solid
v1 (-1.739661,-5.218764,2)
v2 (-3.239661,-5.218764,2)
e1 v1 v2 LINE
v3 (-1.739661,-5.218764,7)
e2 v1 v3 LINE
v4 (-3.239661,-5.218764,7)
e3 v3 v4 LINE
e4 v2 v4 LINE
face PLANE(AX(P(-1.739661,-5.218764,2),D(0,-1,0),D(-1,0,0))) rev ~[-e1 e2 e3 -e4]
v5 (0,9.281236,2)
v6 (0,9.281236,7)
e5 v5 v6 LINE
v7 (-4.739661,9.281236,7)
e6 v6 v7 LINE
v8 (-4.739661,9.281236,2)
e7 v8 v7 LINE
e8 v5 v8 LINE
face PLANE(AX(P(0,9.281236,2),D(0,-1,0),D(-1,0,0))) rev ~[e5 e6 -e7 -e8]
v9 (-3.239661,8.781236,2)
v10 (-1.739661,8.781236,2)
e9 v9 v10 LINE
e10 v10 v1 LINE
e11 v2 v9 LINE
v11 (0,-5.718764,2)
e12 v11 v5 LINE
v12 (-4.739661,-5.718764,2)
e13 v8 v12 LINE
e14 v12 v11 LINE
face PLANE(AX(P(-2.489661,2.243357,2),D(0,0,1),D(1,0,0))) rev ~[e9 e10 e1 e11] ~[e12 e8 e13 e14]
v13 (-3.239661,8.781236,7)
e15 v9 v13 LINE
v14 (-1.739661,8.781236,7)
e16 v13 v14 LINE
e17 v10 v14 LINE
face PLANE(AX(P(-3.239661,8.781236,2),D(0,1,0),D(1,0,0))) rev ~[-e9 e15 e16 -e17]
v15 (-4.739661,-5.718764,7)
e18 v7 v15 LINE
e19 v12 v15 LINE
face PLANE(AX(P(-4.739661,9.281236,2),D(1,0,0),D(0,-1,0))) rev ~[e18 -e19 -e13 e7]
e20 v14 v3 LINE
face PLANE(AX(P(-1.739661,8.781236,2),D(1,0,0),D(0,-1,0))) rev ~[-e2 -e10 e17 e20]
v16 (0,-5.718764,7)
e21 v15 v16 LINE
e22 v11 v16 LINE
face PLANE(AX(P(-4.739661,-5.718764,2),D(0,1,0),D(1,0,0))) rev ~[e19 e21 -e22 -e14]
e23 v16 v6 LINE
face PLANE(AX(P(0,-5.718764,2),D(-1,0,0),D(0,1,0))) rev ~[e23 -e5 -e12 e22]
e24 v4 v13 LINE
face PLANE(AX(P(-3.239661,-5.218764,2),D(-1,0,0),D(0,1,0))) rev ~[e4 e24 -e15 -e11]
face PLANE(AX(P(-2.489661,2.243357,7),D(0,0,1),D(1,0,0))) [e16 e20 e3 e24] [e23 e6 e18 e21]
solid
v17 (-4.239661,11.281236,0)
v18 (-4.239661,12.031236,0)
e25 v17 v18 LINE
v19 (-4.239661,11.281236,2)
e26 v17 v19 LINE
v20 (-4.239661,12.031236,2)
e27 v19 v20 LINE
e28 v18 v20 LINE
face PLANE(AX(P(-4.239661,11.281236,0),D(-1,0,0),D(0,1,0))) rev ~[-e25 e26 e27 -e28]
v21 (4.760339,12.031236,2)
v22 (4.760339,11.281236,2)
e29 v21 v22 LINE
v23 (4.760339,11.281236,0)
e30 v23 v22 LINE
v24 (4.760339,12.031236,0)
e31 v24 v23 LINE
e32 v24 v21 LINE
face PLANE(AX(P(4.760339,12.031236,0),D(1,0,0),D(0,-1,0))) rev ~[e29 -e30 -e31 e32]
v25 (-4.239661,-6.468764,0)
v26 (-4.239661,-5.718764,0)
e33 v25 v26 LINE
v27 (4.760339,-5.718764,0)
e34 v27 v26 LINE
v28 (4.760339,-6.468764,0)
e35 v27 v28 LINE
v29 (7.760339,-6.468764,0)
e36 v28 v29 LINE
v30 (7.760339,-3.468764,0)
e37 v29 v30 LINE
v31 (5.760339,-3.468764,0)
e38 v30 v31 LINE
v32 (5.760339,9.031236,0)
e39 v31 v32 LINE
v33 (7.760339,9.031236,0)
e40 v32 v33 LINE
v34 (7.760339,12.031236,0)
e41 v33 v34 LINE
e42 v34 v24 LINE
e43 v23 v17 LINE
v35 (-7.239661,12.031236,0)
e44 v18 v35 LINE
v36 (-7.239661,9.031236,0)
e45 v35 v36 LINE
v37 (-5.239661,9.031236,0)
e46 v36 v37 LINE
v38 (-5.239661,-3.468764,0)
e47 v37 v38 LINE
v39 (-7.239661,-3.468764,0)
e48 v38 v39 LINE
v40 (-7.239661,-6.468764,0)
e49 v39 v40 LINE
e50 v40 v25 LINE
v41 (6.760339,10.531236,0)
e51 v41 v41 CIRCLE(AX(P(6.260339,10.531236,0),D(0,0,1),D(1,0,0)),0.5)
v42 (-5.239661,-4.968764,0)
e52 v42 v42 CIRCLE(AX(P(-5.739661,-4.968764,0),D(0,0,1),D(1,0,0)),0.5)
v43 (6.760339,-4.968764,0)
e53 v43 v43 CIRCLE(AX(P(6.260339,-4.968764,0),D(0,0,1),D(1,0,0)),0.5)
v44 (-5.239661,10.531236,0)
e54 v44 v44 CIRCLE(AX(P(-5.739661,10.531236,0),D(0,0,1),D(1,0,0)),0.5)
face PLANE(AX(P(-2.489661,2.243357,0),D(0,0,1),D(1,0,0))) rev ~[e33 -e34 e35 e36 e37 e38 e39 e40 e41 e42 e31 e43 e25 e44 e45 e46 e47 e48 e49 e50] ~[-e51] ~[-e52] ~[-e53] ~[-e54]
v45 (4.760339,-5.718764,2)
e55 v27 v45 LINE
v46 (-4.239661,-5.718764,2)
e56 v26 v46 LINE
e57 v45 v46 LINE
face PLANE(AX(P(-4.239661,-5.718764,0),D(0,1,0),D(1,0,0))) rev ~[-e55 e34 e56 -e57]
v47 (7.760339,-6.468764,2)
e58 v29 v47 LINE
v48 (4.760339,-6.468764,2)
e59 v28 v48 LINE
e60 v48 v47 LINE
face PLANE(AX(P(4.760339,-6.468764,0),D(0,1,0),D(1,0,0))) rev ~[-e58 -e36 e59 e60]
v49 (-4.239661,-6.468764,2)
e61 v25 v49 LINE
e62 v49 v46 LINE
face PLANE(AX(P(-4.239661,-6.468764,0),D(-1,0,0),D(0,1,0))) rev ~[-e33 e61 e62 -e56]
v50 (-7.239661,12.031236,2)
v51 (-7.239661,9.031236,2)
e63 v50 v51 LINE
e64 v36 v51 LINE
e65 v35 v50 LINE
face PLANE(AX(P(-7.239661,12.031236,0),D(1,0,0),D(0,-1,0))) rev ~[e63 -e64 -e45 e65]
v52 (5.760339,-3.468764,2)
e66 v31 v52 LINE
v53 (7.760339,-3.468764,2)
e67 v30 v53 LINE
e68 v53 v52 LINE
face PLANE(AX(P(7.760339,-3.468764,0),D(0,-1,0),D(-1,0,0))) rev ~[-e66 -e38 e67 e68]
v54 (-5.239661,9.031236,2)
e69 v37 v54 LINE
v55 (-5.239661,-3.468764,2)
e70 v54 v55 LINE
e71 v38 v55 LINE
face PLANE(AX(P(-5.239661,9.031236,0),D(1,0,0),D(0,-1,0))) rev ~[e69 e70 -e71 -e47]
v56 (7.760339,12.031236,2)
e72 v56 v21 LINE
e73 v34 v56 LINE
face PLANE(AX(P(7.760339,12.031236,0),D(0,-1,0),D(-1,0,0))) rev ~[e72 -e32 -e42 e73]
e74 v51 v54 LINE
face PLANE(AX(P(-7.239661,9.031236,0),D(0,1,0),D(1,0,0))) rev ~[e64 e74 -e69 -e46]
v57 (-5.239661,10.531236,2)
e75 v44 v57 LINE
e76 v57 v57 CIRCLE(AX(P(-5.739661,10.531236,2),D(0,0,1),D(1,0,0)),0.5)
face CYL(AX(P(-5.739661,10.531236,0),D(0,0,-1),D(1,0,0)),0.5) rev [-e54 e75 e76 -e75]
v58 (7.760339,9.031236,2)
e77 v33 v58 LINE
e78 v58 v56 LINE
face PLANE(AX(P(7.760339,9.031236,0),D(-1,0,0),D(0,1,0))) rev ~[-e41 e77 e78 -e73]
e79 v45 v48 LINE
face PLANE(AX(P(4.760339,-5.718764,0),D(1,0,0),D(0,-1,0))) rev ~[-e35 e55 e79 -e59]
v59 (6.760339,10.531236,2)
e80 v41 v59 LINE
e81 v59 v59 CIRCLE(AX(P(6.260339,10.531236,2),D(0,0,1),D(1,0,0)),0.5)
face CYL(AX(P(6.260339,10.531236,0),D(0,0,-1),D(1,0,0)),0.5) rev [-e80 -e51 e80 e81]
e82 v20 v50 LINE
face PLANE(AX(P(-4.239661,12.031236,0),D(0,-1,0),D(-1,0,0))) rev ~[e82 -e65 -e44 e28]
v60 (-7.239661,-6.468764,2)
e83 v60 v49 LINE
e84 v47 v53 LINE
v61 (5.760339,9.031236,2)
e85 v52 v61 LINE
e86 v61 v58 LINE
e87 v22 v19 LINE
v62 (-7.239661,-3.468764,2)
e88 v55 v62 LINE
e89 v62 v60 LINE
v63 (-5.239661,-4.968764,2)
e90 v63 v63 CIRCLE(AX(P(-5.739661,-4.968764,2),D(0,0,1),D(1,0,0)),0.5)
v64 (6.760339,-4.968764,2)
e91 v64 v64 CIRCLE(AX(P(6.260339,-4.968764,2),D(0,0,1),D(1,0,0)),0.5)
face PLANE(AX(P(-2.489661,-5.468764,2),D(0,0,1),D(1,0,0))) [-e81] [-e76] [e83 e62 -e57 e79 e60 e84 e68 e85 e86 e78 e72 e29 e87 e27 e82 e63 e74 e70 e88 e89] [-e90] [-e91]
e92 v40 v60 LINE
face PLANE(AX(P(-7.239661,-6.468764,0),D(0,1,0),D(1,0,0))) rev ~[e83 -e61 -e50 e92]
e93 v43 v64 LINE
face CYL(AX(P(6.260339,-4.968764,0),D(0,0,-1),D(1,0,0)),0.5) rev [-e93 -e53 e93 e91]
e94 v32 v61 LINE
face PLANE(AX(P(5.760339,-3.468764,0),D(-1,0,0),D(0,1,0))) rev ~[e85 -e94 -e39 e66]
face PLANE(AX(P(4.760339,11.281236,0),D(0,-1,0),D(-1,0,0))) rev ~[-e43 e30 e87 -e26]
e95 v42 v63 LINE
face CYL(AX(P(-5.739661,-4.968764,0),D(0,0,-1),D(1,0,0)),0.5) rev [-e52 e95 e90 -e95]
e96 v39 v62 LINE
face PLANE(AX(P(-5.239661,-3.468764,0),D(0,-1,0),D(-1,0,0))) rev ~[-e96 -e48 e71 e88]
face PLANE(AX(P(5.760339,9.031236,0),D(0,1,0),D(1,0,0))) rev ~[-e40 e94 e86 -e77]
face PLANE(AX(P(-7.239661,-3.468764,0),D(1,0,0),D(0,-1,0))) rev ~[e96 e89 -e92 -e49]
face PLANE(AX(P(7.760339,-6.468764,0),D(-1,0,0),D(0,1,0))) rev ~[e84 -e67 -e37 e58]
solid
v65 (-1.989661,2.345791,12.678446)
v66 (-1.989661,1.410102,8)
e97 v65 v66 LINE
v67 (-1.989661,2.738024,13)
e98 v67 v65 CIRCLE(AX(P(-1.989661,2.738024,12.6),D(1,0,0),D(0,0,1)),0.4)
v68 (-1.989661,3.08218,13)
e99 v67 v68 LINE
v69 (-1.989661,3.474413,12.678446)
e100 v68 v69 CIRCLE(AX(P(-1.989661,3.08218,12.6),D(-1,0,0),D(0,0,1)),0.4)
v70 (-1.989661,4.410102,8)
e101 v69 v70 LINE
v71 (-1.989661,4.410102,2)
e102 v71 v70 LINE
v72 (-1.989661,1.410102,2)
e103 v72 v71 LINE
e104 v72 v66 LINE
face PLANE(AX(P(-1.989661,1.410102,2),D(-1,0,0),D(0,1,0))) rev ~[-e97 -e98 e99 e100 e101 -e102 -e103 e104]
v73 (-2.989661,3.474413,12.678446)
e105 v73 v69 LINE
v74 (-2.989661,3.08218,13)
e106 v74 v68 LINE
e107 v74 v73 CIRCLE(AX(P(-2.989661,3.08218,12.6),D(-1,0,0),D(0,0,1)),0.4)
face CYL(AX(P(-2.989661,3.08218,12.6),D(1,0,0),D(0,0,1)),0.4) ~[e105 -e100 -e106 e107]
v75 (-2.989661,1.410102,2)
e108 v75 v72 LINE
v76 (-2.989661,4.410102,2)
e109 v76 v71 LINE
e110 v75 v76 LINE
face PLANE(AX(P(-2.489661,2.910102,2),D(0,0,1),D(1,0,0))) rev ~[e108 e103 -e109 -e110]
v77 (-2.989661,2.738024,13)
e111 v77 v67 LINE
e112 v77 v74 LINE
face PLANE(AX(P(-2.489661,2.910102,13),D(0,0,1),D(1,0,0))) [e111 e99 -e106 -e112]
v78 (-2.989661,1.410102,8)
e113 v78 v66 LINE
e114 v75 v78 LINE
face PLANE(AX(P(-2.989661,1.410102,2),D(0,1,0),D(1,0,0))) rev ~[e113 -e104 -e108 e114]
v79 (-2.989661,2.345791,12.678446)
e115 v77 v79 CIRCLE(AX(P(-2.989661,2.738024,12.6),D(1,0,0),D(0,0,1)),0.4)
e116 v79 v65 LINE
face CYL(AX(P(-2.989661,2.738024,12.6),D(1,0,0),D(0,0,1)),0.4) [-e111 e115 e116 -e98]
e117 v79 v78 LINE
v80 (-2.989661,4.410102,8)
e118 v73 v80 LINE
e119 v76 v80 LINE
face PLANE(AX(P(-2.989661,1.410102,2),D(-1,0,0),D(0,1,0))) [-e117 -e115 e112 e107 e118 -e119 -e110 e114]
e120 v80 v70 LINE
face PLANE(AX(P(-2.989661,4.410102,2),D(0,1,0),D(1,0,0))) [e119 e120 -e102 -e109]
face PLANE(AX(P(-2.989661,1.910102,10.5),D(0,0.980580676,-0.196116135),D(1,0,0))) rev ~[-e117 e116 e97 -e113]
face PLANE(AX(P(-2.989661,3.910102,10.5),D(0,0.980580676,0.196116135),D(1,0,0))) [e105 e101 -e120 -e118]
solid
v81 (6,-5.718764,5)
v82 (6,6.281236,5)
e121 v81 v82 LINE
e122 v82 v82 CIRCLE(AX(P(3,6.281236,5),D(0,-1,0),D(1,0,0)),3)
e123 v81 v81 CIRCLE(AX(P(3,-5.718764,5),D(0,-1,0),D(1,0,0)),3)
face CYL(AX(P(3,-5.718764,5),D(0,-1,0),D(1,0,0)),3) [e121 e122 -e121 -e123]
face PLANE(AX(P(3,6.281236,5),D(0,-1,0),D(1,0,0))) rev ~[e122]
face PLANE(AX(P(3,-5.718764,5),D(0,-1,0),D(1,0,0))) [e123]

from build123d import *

# Parameters (mm, degrees)
F0_R     = 0.5
F0_W     = 1.5
F0_H     = 14
F1_DEPTH = 2
F3_DEPTH = 5
F4_DEPTH = 2
F5_R     = 3
F6_DEPTH = 12
F2_W     = 1
F2_H     = 3
F7_DEPTH = 11
F8_SIZE2 = 5
F8_SIZE  = 1
F9_SIZE2 = 5
F9_SIZE  = 1
F10_R    = 0.4


with BuildPart() as f1:
    # F0 (on Top) → F1 (new body)
    with BuildSketch(Plane.XY):
        Polygon((-4.7396611795, -5.7187644923), (-4.2396611795, -5.7187644923), (-0.2396611795, -5.7187644923), (-0.2396611795, -5.2187644923), (-1.7396611795, -5.2187644923), (-3.2396611795, -5.2187644923), (-4.7396611795, -5.2187644923), align=None)
        Polygon((-4.2396611795, 12.0312355077), (-7.2396611795, 12.0312355077), (-7.2396611795, 9.0312355077), (-5.2396611795, 9.0312355077), (-5.2396611795, -3.4687644923), (-7.2396611795, -3.4687644923), (-7.2396611795, -6.4687644923), (-4.2396611795, -6.4687644923), (-4.2396611795, -5.7187644923), (-4.7396611795, -5.7187644923), (-4.7396611795, -5.2187644923), (-4.7396611795, 9.2812355077), (-0.2396611795, 9.2812355077), (-0.2396611795, -5.2187644923), (-0.2396611795, -5.7187644923), (4.7603388205, -5.7187644923), (4.7603388205, -6.4687644923), (7.7603388205, -6.4687644923), (7.7603388205, -3.4687644923), (5.7603388205, -3.4687644923), (5.7603388205, 9.0312355077), (7.7603388205, 9.0312355077), (7.7603388205, 12.0312355077), (4.7603388205, 12.0312355077), (4.7603388205, 11.2812355077), (-4.2396611795, 11.2812355077), align=None)
        with Locations((-5.7396611795, -4.9687644923)):
            Circle(F0_R, mode=Mode.SUBTRACT)
        with Locations((6.2603388205, -4.9687644923)):
            Circle(F0_R, mode=Mode.SUBTRACT)
        with Locations((-5.7396611795, 10.5312355077)):
            Circle(F0_R, mode=Mode.SUBTRACT)
        with Locations((6.2603388205, 10.5312355077)):
            Circle(F0_R, mode=Mode.SUBTRACT)
        with Locations((-2.4896611795, 1.7812355077)):
            Rectangle(F0_W, F0_H)
    extrude(amount=F1_DEPTH)



with BuildPart() as f3:
    # F2 (on face) → F3 (new body)
    with BuildSketch(Plane.XY.offset(2)):
        Polygon((-0.2396611795, 9.2812355077), (-4.7396611795, 9.2812355077), (-4.7396611795, -5.2187644923), (-3.2396611795, -5.2187644923), (-3.2396611795, 8.7812355077), (-1.7396611795, 8.7812355077), (-1.7396611795, -5.2187644923), (-0.2396611795, -5.2187644923), align=None)
        Polygon((0, 9.2812355077), (-0.2396611795, 9.2812355077), (-0.2396611795, -5.2187644923), (-1.7396611795, -5.2187644923), (-3.2396611795, -5.2187644923), (-4.7396611795, -5.2187644923), (-4.7396611795, -5.7187644923), (-4.2396611795, -5.7187644923), (0, -5.7187644923), align=None)
    extrude(amount=F3_DEPTH)


with BuildPart() as f1_1:
    add(f1.part)
    # F4 (add): a face of the model
    f4_faces = [f3.part.faces().sort_by_distance(p)[0] for p in [
        (-4.5823511709, 1.7812355077, 2),
    ]]
    extrude(f4_faces, amount=F4_DEPTH)


with BuildPart() as f6:
    # F5 (on face) → F6 (new body)
    with BuildSketch(Plane.XZ.offset(5.7187644923)):
        with Locations((3, 5)):
            Circle(F5_R)
    extrude(amount=-F6_DEPTH)


with BuildPart() as f7:
    # F2 (on face) → F7 (new body)
    with BuildSketch(Plane.XY.offset(2)):
        with Locations((-2.4896611795, 2.910102006)):
            Rectangle(F2_W, F2_H)
    extrude(amount=F7_DEPTH)

    # F8
    f8_edges = [f7.edges().sort_by_distance(p)[0] for p in [
        (-2.489661, 1.410102, 13),
    ]]
    f8_side = f7.faces().sort_by_distance((-2.489661, 2.910102, 13))[0]
    chamfer(f8_edges, length=F8_SIZE, length2=F8_SIZE2, reference=f8_side)

    # F9
    f9_edges = [f7.edges().sort_by_distance(p)[0] for p in [
        (-2.489661, 4.410102, 13),
    ]]
    f9_side = f7.faces().sort_by_distance((-2.489661, 3.410102, 13))[0]
    chamfer(f9_edges, length=F9_SIZE, length2=F9_SIZE2, reference=f9_side)

    # F10
    f10_edges = [f7.edges().sort_by_distance(p)[0] for p in [
        (-2.489661, 3.410102, 13),
        (-2.489661, 2.410102, 13),
    ]]
    fillet(f10_edges, radius=F10_R)


solid = Compound([f3.part, f1_1.part, f6.part, f7.part])
